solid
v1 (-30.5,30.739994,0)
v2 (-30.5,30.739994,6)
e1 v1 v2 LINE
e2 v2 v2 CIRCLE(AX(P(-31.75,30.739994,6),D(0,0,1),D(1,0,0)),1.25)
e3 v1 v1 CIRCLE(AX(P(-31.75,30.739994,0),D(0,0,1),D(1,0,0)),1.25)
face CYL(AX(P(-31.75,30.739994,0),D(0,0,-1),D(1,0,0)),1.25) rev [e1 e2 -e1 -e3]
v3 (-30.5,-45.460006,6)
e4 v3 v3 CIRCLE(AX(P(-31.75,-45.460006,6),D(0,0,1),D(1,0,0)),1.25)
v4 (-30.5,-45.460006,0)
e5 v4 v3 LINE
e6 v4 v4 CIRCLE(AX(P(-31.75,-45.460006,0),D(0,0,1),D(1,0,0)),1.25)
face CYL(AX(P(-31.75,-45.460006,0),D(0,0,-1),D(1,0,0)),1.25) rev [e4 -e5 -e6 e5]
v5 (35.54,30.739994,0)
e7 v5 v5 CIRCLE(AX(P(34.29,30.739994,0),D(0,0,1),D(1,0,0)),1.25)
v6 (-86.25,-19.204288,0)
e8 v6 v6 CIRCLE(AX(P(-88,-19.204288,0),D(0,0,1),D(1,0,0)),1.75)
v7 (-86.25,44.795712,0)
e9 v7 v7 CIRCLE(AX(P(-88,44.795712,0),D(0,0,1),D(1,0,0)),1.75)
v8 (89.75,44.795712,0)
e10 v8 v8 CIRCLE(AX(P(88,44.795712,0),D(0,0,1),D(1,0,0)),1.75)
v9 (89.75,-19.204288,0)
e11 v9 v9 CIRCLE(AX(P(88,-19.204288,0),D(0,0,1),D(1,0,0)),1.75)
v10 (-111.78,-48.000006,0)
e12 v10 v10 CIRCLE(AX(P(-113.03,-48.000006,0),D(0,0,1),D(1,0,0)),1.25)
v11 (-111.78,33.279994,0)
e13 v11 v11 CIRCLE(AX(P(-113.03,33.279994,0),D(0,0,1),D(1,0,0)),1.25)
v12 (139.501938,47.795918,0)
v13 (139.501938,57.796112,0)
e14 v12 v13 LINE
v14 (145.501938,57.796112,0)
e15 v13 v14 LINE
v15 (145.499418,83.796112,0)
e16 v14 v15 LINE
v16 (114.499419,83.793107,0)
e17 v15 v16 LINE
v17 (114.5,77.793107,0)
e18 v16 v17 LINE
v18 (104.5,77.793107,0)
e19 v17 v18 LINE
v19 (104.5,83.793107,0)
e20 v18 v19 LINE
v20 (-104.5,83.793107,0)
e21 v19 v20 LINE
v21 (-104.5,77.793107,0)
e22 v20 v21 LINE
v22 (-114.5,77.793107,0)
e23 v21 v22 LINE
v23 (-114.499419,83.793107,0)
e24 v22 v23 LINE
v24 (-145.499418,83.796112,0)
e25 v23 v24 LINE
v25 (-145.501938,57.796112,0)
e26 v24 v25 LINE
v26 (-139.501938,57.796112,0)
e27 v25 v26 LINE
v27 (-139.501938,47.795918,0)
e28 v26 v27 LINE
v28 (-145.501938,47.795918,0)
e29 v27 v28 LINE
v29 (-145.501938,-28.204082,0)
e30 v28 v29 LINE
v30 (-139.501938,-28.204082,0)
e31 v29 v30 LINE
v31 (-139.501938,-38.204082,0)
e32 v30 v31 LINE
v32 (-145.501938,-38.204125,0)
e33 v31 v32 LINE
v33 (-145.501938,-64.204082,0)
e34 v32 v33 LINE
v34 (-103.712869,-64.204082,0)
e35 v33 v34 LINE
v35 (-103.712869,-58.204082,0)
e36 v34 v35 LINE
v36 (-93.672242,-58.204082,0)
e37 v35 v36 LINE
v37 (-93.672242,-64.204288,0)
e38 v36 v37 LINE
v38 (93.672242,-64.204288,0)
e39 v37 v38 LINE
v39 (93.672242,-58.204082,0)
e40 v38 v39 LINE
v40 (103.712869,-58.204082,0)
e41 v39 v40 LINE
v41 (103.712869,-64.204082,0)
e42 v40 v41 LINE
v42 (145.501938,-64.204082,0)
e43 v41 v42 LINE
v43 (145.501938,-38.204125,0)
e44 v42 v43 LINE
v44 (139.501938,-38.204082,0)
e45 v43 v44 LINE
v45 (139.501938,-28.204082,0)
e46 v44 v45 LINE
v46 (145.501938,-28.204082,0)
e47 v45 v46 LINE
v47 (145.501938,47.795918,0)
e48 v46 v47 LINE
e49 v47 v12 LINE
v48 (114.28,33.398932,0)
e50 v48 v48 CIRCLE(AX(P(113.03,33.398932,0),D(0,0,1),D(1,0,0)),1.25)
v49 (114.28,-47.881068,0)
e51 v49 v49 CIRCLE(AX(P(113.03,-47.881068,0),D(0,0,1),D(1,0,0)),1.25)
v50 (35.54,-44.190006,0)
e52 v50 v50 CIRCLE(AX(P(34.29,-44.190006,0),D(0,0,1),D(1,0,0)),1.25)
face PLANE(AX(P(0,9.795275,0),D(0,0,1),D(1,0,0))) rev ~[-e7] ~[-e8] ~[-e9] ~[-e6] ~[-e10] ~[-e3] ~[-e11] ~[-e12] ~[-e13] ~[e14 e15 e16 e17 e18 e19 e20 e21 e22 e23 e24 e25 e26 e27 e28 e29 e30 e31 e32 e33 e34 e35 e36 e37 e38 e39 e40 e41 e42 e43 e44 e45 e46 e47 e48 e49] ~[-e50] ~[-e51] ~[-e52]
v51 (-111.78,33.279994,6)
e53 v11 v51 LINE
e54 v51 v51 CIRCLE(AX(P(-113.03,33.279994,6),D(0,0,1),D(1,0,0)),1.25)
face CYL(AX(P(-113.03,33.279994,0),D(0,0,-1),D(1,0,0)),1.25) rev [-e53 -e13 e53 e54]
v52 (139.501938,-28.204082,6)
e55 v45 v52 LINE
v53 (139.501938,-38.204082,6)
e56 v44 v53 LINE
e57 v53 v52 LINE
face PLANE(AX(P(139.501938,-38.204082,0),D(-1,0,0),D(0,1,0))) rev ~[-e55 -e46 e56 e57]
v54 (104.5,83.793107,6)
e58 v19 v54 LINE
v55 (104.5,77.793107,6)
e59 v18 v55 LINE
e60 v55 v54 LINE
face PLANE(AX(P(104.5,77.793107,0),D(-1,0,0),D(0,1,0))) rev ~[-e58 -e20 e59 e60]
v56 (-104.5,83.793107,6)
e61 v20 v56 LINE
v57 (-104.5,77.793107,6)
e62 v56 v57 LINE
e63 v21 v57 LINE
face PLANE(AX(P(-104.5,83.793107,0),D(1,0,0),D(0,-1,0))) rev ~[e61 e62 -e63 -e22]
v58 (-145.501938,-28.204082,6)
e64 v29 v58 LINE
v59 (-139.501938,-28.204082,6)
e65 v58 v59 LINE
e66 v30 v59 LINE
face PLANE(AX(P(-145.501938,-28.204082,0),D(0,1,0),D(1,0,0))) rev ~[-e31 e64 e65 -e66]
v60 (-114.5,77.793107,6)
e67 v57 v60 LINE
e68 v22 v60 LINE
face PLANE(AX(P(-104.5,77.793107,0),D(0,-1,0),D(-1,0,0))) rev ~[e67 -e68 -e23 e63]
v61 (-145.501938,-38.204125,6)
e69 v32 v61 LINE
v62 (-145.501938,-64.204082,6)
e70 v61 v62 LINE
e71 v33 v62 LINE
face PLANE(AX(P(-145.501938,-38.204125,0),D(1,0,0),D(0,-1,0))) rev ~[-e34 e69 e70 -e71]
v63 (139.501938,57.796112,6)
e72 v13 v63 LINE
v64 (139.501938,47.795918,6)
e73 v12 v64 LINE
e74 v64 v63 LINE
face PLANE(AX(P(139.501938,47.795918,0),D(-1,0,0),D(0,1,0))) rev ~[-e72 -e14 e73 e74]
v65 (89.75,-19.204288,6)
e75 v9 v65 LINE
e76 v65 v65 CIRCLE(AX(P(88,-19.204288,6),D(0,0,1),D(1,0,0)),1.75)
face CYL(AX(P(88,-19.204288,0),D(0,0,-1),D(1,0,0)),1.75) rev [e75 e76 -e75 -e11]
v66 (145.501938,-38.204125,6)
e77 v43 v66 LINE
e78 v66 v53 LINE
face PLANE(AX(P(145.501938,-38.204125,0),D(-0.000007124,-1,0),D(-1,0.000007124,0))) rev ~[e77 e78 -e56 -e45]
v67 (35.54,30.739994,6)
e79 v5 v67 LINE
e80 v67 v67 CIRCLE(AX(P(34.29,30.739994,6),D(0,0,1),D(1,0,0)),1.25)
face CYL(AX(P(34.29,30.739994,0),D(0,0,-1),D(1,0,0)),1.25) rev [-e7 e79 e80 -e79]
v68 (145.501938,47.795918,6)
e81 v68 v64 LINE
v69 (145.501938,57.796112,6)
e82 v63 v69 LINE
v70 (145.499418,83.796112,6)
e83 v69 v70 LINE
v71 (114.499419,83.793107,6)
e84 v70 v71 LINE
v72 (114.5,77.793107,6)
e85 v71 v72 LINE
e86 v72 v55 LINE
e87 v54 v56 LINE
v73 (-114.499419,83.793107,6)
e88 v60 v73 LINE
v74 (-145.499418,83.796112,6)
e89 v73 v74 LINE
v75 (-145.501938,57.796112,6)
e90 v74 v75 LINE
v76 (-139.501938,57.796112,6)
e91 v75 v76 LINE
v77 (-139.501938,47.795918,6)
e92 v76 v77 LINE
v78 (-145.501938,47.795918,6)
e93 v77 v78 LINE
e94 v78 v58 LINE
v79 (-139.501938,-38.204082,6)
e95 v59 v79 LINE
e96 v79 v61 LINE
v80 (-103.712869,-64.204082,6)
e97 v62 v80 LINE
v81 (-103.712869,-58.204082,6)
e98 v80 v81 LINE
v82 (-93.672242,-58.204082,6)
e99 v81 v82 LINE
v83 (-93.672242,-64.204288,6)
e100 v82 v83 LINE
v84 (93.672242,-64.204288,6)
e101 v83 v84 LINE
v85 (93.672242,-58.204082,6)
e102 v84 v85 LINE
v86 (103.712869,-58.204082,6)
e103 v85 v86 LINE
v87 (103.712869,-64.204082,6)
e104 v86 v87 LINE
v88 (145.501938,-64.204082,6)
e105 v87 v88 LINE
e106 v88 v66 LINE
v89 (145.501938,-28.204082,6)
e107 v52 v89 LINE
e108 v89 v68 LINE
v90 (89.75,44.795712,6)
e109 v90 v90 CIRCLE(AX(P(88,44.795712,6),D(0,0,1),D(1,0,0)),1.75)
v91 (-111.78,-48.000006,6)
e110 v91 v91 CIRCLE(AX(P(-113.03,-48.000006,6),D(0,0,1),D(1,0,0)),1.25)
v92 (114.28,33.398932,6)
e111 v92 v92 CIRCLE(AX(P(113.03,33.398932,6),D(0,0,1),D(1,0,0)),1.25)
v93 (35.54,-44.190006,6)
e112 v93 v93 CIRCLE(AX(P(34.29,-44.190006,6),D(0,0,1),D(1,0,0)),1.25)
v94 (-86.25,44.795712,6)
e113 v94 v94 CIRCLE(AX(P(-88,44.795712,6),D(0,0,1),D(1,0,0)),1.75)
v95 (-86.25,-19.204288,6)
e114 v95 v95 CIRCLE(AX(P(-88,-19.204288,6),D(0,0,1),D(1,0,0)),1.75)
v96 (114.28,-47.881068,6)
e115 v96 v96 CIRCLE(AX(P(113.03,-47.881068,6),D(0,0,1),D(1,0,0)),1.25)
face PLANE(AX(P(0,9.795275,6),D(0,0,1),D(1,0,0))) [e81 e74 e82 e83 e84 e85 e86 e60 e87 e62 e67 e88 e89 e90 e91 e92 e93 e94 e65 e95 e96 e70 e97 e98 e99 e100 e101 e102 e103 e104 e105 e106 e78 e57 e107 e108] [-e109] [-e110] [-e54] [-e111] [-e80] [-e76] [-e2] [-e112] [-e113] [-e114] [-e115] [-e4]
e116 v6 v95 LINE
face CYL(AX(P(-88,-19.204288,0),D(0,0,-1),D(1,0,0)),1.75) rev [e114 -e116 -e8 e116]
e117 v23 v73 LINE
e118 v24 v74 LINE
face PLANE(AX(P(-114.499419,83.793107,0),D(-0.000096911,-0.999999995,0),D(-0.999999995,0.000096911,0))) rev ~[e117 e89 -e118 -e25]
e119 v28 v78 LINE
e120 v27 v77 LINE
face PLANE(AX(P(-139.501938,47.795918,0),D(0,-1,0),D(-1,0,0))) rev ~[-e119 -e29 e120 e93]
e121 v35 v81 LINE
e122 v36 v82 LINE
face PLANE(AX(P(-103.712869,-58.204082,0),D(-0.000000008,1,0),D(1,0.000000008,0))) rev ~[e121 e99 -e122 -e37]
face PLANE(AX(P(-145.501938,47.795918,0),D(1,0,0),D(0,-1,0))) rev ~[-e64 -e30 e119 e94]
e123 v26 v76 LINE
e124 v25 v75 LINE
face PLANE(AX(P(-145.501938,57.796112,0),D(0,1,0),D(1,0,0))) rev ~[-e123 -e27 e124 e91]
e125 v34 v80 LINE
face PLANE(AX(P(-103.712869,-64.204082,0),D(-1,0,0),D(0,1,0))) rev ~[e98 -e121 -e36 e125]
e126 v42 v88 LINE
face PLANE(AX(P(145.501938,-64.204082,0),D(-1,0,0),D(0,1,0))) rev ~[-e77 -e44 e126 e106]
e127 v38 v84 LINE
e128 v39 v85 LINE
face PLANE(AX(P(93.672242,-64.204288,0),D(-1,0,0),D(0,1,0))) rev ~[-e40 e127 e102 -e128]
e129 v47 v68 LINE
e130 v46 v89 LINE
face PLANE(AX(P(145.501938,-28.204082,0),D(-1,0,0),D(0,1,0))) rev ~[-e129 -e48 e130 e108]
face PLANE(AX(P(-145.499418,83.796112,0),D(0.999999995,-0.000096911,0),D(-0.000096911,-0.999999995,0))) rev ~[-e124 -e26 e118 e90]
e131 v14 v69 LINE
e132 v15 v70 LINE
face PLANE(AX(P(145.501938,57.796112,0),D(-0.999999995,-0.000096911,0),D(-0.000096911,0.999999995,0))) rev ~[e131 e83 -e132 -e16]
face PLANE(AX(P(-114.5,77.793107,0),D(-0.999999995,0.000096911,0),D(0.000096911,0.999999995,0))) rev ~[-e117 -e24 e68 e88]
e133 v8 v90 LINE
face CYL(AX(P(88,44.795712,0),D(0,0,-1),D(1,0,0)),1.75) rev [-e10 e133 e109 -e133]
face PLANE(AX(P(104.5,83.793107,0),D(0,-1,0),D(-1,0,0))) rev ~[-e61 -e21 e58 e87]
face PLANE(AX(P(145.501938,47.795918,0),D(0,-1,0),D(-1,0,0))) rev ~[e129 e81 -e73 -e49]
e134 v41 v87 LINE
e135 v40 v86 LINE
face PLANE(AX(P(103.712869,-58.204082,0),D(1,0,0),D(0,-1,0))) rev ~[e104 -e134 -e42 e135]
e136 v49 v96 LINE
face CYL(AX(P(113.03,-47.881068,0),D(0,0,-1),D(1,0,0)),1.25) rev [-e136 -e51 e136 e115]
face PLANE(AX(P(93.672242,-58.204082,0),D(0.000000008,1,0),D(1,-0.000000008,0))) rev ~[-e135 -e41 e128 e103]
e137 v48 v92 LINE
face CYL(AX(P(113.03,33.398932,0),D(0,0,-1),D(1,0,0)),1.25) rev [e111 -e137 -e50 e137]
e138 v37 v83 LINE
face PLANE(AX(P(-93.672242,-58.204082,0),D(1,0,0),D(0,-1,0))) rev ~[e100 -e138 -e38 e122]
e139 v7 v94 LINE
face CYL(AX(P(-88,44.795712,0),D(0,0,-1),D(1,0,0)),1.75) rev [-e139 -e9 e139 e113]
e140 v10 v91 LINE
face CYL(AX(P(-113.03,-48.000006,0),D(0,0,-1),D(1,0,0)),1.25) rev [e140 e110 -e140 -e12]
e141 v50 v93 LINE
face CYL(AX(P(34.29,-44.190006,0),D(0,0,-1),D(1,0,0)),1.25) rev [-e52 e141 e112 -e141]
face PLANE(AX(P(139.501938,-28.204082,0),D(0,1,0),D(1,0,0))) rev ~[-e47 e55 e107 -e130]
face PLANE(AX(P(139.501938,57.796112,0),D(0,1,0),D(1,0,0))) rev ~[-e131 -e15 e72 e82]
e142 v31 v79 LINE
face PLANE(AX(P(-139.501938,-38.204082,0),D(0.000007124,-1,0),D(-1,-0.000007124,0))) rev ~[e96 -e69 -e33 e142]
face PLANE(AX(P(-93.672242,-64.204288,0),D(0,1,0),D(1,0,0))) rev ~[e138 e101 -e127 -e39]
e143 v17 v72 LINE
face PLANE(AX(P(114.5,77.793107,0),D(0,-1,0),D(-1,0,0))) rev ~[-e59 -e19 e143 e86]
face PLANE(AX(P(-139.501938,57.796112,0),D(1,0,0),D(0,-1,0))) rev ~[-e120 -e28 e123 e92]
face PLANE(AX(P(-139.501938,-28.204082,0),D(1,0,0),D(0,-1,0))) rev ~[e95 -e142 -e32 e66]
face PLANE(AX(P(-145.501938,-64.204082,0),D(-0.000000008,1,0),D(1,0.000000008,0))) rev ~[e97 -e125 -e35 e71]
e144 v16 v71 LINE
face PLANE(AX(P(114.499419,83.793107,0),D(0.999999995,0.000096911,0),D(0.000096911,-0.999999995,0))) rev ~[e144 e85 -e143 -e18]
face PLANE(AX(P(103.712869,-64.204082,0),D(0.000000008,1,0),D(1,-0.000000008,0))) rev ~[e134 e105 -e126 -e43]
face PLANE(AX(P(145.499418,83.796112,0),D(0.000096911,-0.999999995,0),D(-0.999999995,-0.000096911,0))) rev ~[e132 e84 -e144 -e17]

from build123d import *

# Parameters (mm, degrees)
F0_R     = 1.25
F0_R_2   = 1.75
F1_DEPTH = 6


# Not quite as in the source:
# - a feature names something its author has since deleted; it is built from what else it names


with BuildPart() as f1:
    # F0 (on Top) → F1 (new body)
    with BuildSketch(Plane.XY):
        Polygon((145.5019380654, -28.2040820618), (145.5019380654, 47.7959179382), (139.5019380654, 47.7959179382), (139.5019380654, 57.7961117593), (145.5019380654, 57.7961117593), (145.4994183911, 83.7961116372), (114.4994185367, 83.7931074102), (114.5, 77.7931074384), (104.5, 77.7931074384), (104.5, 83.793107429), (0, 83.793107429), (-104.5, 83.793107429), (-104.5, 77.7931074384), (-114.5, 77.7931074384), (-114.4994185367, 83.7931074102), (-145.4994183911, 83.7961116372), (-145.5019380654, 57.7961117593), (-139.5019380654, 57.7961117593), (-139.5019380654, 47.7959179382), (-145.5019380654, 47.7959179382), (-145.5019380654, -28.2040820618), (-139.5019380654, -28.2040820618), (-139.5019380654, -38.2040820618), (-145.5019380652, -38.2041248082), (-145.5019380652, -64.2040820618), (-103.7128691326, -64.2040817458), (-103.7128691326, -58.2040817458), (-93.6722421218, -58.2040816699), (-93.6722421218, -64.2042880704), (-4.2916e-06, -64.2042880704), (93.6722421218, -64.2042880704), (93.6722421218, -58.2040816699), (103.7128691326, -58.2040817458), (103.7128691326, -64.2040817458), (145.5019380652, -64.2040820618), (145.5019380652, -38.2041248082), (139.5019380654, -38.2040820618), (139.5019380654, -28.2040820618), align=None)
        with Locations((-113.03, -48.0000058421)):
            Circle(F0_R, mode=Mode.SUBTRACT)
        with Locations((-31.75, -45.4600058421)):
            Circle(F0_R, mode=Mode.SUBTRACT)
        with Locations((-88, -19.2042880704)):
            Circle(F0_R_2, mode=Mode.SUBTRACT)
        with Locations((34.29, -44.1900058421)):
            Circle(F0_R, mode=Mode.SUBTRACT)
        with Locations((113.03, -47.8810681991)):
            Circle(F0_R, mode=Mode.SUBTRACT)
        with Locations((88, -19.2042880704)):
            Circle(F0_R_2, mode=Mode.SUBTRACT)
        with Locations((-113.03, 33.2799941579)):
            Circle(F0_R, mode=Mode.SUBTRACT)
        with Locations((-88, 44.7957119296)):
            Circle(F0_R_2, mode=Mode.SUBTRACT)
        with Locations((-31.75, 30.7399941579)):
            Circle(F0_R, mode=Mode.SUBTRACT)
        with Locations((34.29, 30.7399941579)):
            Circle(F0_R, mode=Mode.SUBTRACT)
        with Locations((88, 44.7957119296)):
            Circle(F0_R_2, mode=Mode.SUBTRACT)
        with Locations((113.03, 33.3989318009)):
            Circle(F0_R, mode=Mode.SUBTRACT)
    extrude(amount=F1_DEPTH)


solid = f1.part
